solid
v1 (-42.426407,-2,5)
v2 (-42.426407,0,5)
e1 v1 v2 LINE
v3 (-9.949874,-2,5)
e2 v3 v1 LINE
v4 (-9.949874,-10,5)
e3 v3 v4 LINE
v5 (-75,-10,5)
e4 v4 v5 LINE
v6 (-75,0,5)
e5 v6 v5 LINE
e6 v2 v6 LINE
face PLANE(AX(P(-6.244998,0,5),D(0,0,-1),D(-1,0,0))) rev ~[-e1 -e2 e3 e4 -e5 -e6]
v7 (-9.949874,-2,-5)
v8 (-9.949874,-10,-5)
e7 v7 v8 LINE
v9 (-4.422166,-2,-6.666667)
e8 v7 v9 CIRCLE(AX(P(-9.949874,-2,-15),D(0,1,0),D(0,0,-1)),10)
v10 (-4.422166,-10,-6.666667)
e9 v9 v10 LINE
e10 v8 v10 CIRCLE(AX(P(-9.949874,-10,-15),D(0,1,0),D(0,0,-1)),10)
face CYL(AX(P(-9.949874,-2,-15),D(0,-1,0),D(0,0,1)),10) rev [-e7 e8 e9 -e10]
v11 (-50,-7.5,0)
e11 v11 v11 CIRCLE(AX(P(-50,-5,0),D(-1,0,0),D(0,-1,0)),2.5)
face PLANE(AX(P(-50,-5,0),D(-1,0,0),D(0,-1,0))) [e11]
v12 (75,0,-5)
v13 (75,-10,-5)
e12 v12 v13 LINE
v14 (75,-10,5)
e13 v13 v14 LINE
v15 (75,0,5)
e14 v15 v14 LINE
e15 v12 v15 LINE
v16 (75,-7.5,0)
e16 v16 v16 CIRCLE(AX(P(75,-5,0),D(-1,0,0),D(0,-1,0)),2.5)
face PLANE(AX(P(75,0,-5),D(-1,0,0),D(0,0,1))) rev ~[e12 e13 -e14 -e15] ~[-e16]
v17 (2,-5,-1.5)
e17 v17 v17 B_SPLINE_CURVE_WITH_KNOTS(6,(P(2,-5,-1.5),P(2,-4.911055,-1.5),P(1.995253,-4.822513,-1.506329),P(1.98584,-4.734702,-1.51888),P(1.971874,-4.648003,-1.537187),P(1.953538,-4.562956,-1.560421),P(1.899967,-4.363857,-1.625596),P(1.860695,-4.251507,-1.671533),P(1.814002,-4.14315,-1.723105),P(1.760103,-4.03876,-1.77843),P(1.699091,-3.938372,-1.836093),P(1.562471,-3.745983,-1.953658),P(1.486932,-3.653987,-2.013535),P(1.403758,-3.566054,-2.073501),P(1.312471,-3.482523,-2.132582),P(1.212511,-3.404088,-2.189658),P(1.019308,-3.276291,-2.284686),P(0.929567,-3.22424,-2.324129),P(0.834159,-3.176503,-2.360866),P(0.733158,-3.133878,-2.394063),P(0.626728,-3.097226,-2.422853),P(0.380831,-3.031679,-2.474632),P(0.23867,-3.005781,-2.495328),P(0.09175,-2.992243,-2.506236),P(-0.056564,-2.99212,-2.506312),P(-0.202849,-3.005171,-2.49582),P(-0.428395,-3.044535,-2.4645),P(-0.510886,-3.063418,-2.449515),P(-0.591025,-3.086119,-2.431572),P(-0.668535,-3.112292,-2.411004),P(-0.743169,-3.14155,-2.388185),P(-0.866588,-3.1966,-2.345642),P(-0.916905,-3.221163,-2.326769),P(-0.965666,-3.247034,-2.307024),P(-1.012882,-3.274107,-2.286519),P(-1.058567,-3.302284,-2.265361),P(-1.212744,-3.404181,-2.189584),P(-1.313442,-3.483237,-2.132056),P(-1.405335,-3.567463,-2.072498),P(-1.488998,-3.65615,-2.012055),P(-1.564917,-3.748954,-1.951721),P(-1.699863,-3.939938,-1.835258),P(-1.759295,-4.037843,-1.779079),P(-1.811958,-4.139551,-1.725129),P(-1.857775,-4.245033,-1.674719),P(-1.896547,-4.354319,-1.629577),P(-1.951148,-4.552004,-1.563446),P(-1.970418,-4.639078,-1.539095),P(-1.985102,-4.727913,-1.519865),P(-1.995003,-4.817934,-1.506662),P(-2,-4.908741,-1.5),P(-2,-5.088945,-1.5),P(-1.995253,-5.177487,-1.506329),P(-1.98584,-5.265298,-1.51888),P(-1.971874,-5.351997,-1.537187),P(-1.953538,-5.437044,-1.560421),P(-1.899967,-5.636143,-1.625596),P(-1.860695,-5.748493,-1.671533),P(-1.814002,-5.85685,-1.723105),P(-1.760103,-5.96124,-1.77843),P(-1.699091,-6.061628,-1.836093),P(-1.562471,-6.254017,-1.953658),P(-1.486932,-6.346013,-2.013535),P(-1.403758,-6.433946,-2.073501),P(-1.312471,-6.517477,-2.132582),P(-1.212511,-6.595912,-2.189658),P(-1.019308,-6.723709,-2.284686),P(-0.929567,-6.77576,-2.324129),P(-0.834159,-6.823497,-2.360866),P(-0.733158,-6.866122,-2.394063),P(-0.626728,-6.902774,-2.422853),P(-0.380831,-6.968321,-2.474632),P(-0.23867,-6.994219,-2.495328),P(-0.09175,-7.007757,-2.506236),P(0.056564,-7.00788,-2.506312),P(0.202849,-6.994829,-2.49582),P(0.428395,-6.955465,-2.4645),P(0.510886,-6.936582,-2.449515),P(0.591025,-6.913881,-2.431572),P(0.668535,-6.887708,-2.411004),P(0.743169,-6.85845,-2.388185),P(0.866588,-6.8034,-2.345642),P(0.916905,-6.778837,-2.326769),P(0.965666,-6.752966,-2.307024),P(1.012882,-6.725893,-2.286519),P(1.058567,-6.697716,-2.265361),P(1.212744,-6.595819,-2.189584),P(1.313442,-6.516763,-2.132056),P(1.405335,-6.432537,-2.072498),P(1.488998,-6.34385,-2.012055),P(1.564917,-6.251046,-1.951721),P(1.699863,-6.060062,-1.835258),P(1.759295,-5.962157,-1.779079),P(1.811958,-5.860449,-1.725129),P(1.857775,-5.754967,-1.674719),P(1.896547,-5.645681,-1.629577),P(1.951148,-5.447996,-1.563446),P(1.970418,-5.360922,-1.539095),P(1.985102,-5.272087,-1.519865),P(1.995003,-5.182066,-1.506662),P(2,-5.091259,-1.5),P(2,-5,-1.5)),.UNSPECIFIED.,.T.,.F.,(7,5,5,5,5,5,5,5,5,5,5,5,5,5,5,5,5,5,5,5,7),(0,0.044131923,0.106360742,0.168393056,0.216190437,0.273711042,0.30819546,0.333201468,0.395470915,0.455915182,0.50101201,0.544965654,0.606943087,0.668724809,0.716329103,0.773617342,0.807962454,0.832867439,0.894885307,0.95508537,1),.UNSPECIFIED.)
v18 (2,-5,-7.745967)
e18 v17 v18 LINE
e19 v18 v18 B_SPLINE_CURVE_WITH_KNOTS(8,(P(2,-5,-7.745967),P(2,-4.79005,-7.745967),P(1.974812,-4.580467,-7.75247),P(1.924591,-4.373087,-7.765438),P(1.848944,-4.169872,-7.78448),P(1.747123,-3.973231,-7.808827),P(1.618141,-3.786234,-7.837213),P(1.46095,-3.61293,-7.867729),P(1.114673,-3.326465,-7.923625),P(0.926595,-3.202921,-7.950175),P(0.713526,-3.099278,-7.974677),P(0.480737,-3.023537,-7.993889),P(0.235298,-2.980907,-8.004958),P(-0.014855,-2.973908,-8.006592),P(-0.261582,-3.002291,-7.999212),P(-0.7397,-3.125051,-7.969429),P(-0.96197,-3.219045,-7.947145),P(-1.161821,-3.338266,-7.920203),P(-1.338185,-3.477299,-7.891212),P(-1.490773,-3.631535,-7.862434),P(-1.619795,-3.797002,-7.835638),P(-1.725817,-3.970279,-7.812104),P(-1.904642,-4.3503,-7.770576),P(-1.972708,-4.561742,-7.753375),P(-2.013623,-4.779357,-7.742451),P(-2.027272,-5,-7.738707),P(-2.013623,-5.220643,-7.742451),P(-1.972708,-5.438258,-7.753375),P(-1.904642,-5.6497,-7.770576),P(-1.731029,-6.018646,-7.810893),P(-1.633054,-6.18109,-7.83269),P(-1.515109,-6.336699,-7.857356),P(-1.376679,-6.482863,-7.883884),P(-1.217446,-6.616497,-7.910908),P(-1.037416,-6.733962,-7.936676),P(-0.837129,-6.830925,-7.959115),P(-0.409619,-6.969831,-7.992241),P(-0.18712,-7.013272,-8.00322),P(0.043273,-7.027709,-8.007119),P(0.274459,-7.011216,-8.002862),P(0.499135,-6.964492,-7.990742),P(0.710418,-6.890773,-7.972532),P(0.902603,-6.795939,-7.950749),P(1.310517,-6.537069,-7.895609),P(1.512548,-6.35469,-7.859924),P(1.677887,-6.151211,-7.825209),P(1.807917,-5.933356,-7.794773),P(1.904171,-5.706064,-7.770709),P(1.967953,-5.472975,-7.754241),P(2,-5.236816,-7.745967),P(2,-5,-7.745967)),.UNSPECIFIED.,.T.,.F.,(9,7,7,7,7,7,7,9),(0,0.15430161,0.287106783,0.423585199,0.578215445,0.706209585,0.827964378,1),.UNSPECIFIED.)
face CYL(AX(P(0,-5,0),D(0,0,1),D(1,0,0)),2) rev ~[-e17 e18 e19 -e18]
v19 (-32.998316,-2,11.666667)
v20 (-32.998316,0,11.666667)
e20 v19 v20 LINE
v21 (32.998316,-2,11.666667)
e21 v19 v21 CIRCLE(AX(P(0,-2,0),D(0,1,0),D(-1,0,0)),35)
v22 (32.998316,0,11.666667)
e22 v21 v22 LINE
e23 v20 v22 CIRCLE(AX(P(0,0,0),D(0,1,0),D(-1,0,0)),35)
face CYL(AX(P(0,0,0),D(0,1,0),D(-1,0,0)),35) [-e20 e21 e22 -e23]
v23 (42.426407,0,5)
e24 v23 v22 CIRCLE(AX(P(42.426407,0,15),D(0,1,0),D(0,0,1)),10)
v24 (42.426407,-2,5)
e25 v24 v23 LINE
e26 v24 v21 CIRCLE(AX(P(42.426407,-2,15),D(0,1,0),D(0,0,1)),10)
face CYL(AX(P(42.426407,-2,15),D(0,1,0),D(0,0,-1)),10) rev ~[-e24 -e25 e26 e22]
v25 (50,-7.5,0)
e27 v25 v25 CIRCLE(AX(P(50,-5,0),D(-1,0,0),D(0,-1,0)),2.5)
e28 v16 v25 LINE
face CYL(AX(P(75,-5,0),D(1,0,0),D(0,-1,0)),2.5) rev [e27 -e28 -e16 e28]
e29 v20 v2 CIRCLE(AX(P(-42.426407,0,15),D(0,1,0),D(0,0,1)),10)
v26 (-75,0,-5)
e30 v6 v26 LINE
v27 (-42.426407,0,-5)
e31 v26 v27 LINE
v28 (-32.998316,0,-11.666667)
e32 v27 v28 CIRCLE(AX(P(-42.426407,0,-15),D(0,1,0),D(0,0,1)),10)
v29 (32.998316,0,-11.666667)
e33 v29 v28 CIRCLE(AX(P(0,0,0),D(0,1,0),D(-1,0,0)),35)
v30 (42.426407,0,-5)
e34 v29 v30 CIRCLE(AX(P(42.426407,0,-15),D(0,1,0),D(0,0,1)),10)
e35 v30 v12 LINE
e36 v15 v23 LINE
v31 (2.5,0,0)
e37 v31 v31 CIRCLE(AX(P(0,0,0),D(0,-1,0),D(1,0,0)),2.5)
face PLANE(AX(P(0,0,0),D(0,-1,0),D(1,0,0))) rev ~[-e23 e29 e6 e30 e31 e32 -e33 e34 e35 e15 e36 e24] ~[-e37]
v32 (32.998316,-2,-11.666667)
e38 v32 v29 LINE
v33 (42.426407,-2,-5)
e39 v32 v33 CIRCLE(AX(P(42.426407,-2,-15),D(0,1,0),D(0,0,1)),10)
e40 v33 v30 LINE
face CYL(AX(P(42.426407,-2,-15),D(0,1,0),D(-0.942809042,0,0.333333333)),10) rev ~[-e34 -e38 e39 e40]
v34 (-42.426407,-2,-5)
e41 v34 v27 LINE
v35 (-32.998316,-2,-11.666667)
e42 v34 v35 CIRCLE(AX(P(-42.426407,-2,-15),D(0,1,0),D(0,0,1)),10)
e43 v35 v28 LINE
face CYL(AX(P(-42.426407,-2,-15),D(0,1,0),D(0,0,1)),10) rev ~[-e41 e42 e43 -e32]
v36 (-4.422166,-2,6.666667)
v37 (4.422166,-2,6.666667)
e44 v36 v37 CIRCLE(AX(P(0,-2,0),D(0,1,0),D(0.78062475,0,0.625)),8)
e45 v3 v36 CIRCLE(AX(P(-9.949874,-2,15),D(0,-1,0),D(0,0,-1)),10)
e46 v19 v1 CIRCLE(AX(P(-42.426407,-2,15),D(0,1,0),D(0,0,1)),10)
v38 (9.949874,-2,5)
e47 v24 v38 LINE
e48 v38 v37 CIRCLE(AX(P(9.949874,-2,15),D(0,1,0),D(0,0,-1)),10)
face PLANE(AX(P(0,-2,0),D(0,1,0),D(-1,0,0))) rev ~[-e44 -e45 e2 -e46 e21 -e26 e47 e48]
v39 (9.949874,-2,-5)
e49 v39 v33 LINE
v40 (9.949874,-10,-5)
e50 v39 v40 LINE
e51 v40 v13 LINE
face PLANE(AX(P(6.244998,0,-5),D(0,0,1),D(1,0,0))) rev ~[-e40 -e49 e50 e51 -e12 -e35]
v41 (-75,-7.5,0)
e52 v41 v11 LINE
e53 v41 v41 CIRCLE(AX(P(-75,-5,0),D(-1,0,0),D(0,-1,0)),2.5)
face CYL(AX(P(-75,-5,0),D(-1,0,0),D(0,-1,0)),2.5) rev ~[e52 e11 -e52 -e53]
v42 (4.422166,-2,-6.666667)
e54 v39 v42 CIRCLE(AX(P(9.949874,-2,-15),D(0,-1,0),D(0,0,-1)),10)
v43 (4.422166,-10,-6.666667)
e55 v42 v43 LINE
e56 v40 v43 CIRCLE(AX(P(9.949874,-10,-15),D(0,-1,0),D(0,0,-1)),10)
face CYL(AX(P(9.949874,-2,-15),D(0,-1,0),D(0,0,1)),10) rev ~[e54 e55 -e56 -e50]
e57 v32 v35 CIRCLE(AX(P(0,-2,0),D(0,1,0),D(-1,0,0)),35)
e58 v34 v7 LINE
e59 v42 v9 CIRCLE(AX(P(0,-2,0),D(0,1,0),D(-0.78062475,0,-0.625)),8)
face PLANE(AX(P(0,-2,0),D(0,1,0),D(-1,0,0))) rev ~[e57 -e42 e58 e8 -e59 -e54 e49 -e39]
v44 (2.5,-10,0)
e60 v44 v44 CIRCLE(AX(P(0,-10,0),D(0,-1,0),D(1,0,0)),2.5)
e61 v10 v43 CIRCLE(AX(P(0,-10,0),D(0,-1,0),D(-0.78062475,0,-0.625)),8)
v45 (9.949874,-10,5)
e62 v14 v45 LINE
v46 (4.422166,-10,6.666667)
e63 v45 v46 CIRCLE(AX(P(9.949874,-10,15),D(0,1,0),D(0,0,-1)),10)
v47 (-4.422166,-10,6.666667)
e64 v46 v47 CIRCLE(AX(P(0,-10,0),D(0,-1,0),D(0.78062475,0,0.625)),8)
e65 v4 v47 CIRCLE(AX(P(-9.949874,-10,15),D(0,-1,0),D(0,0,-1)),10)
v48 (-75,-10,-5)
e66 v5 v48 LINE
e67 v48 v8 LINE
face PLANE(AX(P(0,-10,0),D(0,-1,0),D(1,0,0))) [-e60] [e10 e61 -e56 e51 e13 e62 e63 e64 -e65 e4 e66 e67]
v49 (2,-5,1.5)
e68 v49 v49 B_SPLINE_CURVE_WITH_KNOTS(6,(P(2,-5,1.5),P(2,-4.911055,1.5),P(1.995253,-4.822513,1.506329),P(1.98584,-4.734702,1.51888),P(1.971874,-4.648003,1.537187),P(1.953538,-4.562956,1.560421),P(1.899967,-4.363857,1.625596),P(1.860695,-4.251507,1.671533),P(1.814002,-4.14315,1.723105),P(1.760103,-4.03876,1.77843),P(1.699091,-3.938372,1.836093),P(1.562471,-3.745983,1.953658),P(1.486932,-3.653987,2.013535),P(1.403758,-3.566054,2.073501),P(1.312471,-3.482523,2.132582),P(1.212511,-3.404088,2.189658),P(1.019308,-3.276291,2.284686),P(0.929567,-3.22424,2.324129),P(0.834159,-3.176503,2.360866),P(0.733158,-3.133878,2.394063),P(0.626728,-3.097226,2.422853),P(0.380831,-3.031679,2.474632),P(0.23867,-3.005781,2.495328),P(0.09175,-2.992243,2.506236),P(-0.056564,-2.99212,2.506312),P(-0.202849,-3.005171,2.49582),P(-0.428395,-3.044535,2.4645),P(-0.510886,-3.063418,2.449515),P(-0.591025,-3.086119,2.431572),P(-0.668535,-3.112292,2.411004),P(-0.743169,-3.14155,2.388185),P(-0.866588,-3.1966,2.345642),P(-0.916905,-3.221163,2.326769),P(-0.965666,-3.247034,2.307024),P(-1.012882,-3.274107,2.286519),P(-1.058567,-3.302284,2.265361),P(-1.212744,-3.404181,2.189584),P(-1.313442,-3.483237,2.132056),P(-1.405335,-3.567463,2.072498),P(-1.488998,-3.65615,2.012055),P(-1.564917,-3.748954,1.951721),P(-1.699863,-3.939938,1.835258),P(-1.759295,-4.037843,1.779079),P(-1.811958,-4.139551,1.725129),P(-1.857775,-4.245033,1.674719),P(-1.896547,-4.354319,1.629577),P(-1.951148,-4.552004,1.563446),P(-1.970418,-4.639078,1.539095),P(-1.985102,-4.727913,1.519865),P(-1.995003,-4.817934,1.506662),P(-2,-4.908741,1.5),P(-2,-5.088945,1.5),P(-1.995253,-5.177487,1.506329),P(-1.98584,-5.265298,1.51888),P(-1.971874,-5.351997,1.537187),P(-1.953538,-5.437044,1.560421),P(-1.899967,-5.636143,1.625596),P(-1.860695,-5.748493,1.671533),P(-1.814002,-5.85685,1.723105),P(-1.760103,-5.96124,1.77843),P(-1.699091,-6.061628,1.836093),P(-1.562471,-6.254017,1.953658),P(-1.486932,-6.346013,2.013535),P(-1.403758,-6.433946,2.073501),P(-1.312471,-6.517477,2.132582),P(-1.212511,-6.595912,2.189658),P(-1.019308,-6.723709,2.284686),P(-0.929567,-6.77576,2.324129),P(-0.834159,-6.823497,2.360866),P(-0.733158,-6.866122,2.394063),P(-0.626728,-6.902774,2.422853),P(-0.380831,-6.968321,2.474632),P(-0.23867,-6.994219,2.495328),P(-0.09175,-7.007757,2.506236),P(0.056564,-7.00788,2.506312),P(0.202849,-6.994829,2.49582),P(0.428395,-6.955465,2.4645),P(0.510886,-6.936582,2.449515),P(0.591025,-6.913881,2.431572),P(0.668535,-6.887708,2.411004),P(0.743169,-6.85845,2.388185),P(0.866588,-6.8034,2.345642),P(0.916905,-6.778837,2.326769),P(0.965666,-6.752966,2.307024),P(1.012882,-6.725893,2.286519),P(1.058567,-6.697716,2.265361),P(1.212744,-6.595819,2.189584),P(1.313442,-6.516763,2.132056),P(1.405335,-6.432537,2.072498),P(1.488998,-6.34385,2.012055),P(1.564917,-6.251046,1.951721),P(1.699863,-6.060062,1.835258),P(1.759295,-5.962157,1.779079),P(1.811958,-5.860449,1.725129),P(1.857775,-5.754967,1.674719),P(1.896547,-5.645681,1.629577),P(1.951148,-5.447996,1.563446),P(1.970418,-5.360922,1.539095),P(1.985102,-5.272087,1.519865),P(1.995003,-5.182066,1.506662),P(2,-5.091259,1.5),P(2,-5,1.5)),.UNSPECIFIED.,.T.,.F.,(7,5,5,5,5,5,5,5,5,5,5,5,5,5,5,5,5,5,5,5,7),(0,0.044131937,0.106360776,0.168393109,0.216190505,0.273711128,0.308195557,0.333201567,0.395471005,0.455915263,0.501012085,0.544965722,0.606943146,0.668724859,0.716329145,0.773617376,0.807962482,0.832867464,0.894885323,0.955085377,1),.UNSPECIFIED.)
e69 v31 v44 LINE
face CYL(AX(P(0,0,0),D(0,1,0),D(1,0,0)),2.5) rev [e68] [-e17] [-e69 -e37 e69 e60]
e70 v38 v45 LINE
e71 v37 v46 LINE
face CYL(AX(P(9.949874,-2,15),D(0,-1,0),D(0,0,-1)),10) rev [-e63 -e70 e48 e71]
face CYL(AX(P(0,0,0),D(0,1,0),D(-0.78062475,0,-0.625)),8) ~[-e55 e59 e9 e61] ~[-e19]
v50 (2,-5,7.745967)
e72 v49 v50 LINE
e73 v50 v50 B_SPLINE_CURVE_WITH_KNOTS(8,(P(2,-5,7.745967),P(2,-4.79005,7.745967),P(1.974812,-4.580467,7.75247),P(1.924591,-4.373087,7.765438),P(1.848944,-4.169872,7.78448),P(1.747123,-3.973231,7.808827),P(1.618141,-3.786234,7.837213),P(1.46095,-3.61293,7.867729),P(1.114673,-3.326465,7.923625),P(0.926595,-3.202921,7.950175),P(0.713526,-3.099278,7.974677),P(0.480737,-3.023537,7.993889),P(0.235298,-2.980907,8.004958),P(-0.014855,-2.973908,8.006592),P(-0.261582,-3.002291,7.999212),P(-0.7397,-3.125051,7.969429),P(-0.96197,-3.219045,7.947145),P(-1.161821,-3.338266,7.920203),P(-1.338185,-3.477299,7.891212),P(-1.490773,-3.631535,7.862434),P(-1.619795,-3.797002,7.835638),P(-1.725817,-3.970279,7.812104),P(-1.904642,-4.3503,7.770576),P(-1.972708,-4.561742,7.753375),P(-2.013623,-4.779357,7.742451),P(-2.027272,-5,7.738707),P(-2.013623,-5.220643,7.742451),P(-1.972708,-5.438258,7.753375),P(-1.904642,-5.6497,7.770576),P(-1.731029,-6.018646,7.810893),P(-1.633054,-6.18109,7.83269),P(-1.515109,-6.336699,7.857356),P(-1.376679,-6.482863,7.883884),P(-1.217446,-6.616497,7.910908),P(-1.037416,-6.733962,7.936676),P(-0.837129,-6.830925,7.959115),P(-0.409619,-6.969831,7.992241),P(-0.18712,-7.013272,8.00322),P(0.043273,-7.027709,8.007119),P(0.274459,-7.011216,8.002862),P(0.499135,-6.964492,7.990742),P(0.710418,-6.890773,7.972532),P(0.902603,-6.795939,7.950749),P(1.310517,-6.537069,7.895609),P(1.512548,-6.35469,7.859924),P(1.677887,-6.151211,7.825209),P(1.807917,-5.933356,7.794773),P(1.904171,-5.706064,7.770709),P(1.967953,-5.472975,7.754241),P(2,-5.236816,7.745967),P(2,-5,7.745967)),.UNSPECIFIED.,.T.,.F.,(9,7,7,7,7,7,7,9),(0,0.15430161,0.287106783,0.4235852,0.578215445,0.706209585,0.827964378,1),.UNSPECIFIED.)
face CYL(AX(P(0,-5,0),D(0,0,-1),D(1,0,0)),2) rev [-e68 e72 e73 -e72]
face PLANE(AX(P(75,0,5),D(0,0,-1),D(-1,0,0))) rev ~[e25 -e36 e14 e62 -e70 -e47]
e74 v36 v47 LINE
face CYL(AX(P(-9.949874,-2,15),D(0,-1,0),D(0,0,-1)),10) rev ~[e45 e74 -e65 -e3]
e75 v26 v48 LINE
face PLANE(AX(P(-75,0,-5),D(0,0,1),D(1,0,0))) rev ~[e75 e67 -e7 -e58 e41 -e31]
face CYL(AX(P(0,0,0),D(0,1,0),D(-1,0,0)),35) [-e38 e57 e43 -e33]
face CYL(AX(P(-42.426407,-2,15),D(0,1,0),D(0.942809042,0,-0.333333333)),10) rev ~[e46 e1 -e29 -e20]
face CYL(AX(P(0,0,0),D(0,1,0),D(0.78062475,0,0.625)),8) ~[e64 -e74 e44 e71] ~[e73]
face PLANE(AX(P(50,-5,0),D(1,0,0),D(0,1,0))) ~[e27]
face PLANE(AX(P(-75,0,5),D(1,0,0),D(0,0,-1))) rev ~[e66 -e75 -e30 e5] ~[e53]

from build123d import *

# Parameters (mm, degrees)
F0_R          = 2.5
F1_DEPTH      = 10
F2_R          = 35
F2_R_2        = 2.5
F3_DEPTH      = 2
F4_R          = 2.5
F5_DEPTH      = 25
F6_R          = 2
F7_DEPTH      = 35.001
F7_DEPTH_BACK = 35.001
F8_R          = 10


# Not quite as in the source:
# - a pattern or mirror of a feature is missing from the dataset's text; its kind, count and spacing are read off the source's solid


with BuildPart() as f1:
    # F0 (on Front) → F1 (new body)
    with BuildSketch(Plane.XZ):
        with BuildLine():
            Line((75, 5), (6.2449979984, 5))
            ThreePointArc((6.2449979984, 5), (0, 8), (-6.2449979984, 5))
            Line((-6.2449979984, 5), (-75, 5))
            Line((-75, 5), (-75, -5))
            Line((-75, -5), (-6.2449979984, -5))
            ThreePointArc((-6.2449979984, -5), (0, -8), (6.2449979984, -5))
            Line((6.2449979984, -5), (75, -5))
            Line((75, -5), (75, 5))
        make_face()
        Circle(F0_R, mode=Mode.SUBTRACT)
    extrude(amount=F1_DEPTH)

    # F2 (on face) → F3 (join)
    with BuildSketch(Plane(origin=(0, 0, 0), x_dir=(-1, 0, 0), z_dir=(0, 1, 0))):
        Circle(F2_R)
        Circle(F2_R_2, mode=Mode.SUBTRACT)
    extrude(amount=-F3_DEPTH)

    # F4 (on face) → F5 (cut)
    with BuildSketch(Plane(origin=(-75, 0, 0), x_dir=(0, -1, 0), z_dir=(-1, 0, 0))):
        with Locations((5, 0)):
            Circle(F4_R)
    f5 = extrude(amount=-F5_DEPTH, mode=Mode.SUBTRACT)

    # F5_copies: F5 across plane
    add(f5.mirror(Plane(origin=(0, 0, 0), x_dir=(0, 0, 1), z_dir=(1, 0, 0))), mode=Mode.SUBTRACT)

    # F6 (on Top) → F7 (cut, two sides)
    with BuildSketch(Plane.XY) as f7_sk:
        with Locations((0, -5)):
            Circle(F6_R)
    extrude(amount=-F7_DEPTH, mode=Mode.SUBTRACT)
    extrude(f7_sk.sketch, amount=F7_DEPTH_BACK, mode=Mode.SUBTRACT)

    # F8
    f8_edges = [f1.edges().sort_by_distance(p)[0] for p in [
        (-6.244998, -6, 5),
        (6.244998, -6, 5),
        (6.244998, -6, -5),
        (-6.244998, -6, -5),
        (34.641016, -1, 5),
        (34.641016, -1, -5),
        (-34.641016, -1, -5),
        (-34.641016, -1, 5),
    ]]
    fillet(f8_edges, radius=F8_R)


solid = f1.part
